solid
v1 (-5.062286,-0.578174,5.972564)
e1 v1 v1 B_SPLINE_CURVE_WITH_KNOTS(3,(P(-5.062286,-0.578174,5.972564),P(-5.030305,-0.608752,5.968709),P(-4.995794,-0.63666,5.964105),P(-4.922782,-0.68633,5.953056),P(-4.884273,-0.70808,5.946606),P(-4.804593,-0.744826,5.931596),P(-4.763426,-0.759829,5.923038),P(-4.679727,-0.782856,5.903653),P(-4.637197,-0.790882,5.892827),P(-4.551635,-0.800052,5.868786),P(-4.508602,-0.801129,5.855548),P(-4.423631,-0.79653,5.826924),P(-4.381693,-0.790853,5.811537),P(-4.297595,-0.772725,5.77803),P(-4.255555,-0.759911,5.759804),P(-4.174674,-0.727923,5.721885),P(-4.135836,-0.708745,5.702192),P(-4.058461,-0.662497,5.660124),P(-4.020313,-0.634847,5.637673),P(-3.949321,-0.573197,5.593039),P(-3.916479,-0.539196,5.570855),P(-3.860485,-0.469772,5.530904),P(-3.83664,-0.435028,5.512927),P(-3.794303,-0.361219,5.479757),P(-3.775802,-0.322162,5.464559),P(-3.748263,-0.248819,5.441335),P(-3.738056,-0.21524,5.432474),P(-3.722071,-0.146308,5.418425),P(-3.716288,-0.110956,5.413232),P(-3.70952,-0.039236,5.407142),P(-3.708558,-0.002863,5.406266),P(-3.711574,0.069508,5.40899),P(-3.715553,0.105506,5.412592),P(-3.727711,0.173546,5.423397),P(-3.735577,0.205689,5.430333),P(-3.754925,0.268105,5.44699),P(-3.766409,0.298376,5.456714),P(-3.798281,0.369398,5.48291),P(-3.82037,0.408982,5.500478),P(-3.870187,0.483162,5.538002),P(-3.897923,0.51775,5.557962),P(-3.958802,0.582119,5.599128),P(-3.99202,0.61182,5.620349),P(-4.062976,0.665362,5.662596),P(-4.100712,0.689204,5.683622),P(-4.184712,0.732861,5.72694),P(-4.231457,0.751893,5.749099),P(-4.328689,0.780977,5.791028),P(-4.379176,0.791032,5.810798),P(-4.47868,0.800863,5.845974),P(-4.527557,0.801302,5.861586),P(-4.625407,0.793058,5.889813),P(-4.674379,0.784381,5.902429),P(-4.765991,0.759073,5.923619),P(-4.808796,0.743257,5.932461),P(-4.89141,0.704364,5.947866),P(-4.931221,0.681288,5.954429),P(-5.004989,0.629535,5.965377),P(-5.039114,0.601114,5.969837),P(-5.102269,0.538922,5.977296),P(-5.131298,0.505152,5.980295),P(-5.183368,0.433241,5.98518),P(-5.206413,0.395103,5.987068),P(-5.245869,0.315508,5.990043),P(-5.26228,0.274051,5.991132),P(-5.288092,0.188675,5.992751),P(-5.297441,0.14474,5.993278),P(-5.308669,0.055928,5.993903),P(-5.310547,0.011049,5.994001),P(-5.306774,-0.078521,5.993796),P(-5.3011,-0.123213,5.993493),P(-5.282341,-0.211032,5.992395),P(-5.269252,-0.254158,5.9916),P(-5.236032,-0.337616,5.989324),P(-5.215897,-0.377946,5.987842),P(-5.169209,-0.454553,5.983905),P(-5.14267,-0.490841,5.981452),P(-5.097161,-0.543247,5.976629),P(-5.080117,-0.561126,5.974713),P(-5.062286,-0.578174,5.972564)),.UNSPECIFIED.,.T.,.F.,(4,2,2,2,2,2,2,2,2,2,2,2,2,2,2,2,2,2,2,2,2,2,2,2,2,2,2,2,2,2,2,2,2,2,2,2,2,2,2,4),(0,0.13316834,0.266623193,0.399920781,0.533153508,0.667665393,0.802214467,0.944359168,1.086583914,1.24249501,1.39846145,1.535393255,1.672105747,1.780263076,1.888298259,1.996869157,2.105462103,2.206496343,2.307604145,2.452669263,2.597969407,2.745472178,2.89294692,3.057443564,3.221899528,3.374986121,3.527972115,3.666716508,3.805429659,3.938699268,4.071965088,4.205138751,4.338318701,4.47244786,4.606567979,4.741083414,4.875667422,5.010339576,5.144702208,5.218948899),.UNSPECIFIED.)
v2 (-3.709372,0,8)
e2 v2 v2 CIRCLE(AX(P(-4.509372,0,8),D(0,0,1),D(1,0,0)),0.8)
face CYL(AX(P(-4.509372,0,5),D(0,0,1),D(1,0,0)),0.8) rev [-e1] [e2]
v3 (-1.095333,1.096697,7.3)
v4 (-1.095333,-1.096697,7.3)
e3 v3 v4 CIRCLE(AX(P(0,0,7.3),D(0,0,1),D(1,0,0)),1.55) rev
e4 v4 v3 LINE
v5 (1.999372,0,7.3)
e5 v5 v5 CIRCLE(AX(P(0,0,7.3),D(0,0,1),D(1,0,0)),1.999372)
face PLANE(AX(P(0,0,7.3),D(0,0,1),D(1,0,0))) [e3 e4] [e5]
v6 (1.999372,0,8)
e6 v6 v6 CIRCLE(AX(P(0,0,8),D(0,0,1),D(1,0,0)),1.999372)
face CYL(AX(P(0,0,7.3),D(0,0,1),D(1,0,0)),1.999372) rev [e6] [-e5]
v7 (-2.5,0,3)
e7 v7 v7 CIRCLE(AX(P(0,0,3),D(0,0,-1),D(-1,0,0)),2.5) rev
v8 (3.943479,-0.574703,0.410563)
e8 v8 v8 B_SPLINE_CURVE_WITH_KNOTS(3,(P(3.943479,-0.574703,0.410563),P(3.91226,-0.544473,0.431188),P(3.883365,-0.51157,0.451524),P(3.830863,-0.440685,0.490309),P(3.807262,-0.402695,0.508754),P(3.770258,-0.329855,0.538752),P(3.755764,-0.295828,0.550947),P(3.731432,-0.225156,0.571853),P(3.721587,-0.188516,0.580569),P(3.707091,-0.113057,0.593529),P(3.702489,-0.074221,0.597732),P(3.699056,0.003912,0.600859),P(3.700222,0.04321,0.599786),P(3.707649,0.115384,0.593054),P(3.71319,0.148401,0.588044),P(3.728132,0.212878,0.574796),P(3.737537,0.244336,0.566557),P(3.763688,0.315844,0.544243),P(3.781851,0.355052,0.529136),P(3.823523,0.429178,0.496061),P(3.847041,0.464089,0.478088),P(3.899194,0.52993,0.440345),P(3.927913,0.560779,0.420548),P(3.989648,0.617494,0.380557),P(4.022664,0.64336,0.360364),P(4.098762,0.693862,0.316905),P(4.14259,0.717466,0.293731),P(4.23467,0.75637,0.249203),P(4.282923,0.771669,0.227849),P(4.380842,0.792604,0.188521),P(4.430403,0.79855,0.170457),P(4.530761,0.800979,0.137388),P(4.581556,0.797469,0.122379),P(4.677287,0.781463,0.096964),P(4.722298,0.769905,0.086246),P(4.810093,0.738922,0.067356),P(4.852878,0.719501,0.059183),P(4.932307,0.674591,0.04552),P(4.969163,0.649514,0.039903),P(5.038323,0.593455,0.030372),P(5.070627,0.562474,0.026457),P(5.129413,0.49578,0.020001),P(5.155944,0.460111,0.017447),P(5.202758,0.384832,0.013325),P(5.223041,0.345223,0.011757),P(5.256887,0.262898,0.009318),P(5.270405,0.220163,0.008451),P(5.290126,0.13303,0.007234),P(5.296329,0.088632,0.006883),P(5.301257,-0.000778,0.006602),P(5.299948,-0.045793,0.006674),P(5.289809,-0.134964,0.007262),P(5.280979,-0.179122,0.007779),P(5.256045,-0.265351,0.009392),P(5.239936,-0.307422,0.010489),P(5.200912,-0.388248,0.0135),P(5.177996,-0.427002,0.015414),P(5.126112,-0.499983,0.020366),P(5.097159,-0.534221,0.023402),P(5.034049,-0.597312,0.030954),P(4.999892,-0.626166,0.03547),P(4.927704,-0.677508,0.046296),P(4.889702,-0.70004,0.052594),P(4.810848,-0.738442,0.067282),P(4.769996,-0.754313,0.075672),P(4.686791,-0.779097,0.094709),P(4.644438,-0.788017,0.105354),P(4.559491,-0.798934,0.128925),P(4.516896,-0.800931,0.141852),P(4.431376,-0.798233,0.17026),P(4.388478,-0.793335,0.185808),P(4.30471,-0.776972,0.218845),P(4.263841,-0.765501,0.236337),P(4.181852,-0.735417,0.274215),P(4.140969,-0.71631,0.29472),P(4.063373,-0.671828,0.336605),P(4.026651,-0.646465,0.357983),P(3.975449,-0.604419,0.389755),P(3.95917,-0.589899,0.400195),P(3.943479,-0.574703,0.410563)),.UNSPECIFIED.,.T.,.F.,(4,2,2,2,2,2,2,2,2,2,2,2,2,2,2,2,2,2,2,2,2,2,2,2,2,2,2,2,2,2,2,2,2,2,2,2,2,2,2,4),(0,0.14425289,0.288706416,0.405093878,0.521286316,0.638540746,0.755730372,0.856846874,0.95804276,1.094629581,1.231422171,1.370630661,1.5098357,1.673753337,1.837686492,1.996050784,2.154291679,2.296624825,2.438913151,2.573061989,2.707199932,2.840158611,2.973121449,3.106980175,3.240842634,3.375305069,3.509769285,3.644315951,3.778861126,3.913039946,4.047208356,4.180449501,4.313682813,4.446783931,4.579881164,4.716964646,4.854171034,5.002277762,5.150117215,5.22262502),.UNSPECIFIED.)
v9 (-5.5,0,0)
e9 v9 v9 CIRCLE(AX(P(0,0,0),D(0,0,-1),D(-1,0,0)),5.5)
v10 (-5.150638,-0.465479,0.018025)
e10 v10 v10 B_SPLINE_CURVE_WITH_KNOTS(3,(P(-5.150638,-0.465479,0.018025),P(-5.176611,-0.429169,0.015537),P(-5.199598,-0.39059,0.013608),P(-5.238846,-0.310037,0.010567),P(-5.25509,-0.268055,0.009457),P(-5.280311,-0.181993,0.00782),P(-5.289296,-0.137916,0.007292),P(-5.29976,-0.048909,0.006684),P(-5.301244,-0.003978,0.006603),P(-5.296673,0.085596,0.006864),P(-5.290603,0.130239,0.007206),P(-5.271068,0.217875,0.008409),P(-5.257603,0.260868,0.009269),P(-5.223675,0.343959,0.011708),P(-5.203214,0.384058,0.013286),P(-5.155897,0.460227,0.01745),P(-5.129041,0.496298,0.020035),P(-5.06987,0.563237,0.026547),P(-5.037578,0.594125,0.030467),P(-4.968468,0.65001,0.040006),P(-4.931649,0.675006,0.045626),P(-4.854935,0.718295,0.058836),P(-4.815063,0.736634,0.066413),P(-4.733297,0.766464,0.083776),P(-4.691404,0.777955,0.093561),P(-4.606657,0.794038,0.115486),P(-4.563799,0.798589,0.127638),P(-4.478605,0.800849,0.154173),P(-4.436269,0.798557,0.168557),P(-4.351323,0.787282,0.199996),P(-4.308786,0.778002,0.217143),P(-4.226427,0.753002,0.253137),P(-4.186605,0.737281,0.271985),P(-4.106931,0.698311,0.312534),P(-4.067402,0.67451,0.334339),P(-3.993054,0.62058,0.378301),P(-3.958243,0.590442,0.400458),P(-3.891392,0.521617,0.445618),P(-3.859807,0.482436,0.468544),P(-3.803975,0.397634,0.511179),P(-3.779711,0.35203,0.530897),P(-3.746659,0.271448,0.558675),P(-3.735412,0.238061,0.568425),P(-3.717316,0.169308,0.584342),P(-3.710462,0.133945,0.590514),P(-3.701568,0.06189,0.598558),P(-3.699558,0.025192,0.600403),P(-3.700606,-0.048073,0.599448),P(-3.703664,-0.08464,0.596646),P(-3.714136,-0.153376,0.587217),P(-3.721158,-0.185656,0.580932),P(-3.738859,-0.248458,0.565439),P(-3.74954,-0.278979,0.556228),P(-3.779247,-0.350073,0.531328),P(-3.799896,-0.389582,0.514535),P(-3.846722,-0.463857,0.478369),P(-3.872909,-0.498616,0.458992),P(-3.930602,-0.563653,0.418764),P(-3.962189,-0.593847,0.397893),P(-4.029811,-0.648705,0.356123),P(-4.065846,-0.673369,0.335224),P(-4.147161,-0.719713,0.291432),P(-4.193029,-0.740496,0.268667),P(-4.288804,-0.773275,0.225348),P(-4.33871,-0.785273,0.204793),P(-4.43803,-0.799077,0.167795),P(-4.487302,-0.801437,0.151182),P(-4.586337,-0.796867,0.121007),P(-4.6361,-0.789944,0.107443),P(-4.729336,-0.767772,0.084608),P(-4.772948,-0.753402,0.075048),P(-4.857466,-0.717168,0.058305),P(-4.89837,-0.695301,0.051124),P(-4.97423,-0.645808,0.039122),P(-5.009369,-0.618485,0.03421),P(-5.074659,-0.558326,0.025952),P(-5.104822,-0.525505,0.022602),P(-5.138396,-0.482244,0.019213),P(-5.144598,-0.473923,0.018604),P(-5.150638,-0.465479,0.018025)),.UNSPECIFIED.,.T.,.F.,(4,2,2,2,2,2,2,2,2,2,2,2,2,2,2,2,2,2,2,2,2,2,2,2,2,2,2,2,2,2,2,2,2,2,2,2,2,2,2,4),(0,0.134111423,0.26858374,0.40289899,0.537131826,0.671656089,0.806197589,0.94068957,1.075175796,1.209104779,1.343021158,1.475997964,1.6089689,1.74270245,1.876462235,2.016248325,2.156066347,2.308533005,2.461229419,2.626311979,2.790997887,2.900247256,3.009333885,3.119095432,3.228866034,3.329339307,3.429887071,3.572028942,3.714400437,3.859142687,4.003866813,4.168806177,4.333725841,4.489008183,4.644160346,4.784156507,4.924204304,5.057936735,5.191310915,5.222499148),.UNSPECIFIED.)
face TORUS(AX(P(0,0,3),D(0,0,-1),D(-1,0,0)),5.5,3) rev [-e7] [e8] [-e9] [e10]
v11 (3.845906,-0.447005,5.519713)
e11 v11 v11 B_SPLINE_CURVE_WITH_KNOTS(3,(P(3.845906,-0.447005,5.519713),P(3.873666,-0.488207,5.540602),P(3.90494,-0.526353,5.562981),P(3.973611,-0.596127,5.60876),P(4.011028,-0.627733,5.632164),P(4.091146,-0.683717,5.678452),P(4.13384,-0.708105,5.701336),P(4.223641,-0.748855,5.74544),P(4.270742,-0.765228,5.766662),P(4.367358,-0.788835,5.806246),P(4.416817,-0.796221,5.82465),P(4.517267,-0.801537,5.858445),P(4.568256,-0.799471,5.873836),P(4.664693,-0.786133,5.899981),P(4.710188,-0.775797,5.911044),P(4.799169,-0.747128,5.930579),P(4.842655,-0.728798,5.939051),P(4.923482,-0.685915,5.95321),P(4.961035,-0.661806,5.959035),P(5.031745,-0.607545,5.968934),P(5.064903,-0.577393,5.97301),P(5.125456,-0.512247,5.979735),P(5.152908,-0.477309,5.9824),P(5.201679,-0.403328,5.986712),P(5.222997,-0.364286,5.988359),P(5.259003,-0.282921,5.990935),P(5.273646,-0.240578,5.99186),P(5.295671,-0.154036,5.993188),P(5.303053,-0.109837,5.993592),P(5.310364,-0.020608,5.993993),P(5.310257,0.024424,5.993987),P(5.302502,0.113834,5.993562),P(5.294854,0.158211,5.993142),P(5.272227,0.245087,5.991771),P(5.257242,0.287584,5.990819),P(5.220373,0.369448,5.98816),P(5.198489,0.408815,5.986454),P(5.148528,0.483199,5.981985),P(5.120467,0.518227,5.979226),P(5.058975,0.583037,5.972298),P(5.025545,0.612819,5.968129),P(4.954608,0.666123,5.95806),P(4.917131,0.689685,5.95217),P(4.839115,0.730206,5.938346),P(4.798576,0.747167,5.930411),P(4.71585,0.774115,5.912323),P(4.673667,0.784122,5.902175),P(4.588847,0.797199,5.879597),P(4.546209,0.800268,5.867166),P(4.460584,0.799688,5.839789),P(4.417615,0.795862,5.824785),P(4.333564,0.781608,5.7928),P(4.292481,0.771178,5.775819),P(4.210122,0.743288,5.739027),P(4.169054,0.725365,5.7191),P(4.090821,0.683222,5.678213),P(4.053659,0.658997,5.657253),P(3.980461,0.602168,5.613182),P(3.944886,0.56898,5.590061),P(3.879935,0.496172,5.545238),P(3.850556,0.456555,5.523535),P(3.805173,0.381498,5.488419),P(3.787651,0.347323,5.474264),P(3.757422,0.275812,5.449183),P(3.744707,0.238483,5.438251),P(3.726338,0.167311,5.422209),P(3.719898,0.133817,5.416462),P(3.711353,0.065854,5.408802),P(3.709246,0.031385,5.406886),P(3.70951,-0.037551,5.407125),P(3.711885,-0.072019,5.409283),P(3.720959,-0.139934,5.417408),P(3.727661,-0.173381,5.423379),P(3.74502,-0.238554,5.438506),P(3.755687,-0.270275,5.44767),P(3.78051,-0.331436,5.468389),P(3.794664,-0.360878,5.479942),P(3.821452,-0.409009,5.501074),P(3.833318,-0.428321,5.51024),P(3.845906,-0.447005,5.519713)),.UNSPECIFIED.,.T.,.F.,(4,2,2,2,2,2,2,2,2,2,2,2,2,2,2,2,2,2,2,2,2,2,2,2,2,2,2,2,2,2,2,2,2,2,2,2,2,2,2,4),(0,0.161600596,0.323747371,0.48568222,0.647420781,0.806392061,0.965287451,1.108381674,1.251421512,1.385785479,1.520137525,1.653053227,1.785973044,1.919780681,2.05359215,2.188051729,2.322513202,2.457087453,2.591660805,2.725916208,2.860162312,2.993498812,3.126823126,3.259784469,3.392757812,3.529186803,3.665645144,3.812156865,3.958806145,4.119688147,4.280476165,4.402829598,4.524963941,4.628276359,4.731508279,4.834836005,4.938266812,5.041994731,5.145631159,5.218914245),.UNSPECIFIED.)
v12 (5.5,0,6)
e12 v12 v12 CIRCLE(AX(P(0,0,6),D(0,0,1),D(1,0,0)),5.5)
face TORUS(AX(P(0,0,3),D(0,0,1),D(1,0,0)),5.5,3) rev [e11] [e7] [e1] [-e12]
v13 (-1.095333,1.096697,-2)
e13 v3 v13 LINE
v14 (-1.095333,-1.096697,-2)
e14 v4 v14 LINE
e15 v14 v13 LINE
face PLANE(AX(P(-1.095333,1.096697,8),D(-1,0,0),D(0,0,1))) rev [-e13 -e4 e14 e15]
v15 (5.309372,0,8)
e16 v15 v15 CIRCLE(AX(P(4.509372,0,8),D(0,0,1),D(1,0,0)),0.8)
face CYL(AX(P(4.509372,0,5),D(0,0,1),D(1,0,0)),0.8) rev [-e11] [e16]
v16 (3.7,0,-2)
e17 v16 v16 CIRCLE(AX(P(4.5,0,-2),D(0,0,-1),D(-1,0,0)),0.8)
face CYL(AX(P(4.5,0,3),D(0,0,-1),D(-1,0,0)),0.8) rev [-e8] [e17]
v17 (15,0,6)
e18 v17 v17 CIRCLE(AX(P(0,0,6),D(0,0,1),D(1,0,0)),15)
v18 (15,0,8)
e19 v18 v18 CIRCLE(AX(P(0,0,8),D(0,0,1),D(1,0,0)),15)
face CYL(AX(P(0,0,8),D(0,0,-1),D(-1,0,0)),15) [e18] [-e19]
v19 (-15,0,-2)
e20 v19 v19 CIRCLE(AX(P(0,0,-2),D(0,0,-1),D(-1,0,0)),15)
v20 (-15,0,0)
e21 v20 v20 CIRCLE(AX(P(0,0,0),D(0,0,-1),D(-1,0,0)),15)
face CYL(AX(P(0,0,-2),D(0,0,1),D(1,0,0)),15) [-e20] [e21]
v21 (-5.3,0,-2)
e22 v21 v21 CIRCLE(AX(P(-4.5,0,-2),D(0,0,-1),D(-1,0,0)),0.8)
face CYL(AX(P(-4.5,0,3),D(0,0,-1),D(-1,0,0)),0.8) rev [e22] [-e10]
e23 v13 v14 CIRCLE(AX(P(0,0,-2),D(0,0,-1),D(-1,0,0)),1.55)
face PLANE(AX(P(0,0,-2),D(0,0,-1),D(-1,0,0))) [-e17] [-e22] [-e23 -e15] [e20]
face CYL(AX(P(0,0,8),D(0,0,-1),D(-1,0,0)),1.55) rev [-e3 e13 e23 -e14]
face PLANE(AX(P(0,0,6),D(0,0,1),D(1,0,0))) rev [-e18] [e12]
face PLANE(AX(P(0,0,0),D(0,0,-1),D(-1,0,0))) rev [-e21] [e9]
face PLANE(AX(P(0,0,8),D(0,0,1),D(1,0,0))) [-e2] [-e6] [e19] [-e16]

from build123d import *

# Parameters (mm, degrees)
SKETCH1_R           = 2.5
BOSS_EXTRUDE1_DEPTH = 6
SKETCH2_R           = 15
BOSS_EXTRUDE2_DEPTH = 2
BOSS_EXTRUDE3_START = 2
SKETCH3_R           = 15
BOSS_EXTRUDE3_DEPTH = 2
FILLET9_R           = 3
FILLET10_R          = 3
CUT_EXTRUDE1_DEPTH  = 10
SKETCH5_R           = 1.999371682
CUT_EXTRUDE2_DEPTH  = 0.7
SKETCH7_R           = 0.8
CUT_EXTRUDE6_DEPTH  = 3
SKETCH8_R           = 0.8
CUT_EXTRUDE7_DEPTH  = 5


with BuildPart() as part:
    # Sketch1 → Boss-Extrude1 (new body)
    with BuildSketch(Plane.XY):
        Circle(SKETCH1_R)
    extrude(amount=BOSS_EXTRUDE1_DEPTH)

    # Sketch2 → Boss-Extrude2 (add)
    with BuildSketch(Plane(origin=(0, 0, 0), x_dir=(-1, 0, 0), z_dir=(0, 0, -1))):
        Circle(SKETCH2_R)
    extrude(amount=BOSS_EXTRUDE2_DEPTH)

    # Sketch3 → Boss-Extrude3 (add)
    with BuildSketch(Plane.XY.offset(6).offset(BOSS_EXTRUDE3_START)):
        with Locations(Location((0, 0, 0), (0, 0, 180))):
            Circle(SKETCH3_R)
    extrude(amount=-BOSS_EXTRUDE3_DEPTH)

    # Fillet9
    fillet9_edges = [part.edges().sort_by_distance(p)[0] for p in [
        (-2.5, 0, 0),
    ]]
    fillet(fillet9_edges, radius=FILLET9_R)

    # Fillet10
    fillet10_edges = [part.edges().sort_by_distance(p)[0] for p in [
        (-2.5, 0, 6),
    ]]
    fillet(fillet10_edges, radius=FILLET10_R - 0.0001)  # a hair under: the kernel refuses the full size

    # Sketch4 → Cut-Extrude1 (cut)
    with BuildSketch(Plane(origin=(0, 0, -2), x_dir=(-1, 0, 0), z_dir=(0, 0, -1))):
        with BuildLine():
            Line((1.095333333, 1.096697264), (1.095333333, -1.096697264))
            ThreePointArc((1.095333333, -1.096697264), (-1.55, 0), (1.095333333, 1.096697264))
        make_face()
    extrude(amount=-CUT_EXTRUDE1_DEPTH, mode=Mode.SUBTRACT)

    # Sketch5 → Cut-Extrude2 (cut)
    with BuildSketch(Plane.XY.offset(8)):
        Circle(SKETCH5_R)
    extrude(amount=-CUT_EXTRUDE2_DEPTH, mode=Mode.SUBTRACT)

    # Sketch7 → Cut-Extrude6 (cut)
    with BuildSketch(Plane.XY.offset(8)):
        with Locations((4.509371682, 0)):
            Circle(SKETCH7_R)
        with Locations((-4.509371682, 0)):
            Circle(SKETCH7_R)
    extrude(amount=-CUT_EXTRUDE6_DEPTH, mode=Mode.SUBTRACT)

    # Sketch8 → Cut-Extrude7 (cut)
    with BuildSketch(Plane(origin=(0, 0, -2), x_dir=(-1, 0, 0), z_dir=(0, 0, -1))):
        with Locations((-4.5, 0)):
            Circle(SKETCH8_R)
        with Locations((4.5, 0)):
            Circle(SKETCH8_R)
    extrude(amount=-CUT_EXTRUDE7_DEPTH, mode=Mode.SUBTRACT)


solid = part.part
